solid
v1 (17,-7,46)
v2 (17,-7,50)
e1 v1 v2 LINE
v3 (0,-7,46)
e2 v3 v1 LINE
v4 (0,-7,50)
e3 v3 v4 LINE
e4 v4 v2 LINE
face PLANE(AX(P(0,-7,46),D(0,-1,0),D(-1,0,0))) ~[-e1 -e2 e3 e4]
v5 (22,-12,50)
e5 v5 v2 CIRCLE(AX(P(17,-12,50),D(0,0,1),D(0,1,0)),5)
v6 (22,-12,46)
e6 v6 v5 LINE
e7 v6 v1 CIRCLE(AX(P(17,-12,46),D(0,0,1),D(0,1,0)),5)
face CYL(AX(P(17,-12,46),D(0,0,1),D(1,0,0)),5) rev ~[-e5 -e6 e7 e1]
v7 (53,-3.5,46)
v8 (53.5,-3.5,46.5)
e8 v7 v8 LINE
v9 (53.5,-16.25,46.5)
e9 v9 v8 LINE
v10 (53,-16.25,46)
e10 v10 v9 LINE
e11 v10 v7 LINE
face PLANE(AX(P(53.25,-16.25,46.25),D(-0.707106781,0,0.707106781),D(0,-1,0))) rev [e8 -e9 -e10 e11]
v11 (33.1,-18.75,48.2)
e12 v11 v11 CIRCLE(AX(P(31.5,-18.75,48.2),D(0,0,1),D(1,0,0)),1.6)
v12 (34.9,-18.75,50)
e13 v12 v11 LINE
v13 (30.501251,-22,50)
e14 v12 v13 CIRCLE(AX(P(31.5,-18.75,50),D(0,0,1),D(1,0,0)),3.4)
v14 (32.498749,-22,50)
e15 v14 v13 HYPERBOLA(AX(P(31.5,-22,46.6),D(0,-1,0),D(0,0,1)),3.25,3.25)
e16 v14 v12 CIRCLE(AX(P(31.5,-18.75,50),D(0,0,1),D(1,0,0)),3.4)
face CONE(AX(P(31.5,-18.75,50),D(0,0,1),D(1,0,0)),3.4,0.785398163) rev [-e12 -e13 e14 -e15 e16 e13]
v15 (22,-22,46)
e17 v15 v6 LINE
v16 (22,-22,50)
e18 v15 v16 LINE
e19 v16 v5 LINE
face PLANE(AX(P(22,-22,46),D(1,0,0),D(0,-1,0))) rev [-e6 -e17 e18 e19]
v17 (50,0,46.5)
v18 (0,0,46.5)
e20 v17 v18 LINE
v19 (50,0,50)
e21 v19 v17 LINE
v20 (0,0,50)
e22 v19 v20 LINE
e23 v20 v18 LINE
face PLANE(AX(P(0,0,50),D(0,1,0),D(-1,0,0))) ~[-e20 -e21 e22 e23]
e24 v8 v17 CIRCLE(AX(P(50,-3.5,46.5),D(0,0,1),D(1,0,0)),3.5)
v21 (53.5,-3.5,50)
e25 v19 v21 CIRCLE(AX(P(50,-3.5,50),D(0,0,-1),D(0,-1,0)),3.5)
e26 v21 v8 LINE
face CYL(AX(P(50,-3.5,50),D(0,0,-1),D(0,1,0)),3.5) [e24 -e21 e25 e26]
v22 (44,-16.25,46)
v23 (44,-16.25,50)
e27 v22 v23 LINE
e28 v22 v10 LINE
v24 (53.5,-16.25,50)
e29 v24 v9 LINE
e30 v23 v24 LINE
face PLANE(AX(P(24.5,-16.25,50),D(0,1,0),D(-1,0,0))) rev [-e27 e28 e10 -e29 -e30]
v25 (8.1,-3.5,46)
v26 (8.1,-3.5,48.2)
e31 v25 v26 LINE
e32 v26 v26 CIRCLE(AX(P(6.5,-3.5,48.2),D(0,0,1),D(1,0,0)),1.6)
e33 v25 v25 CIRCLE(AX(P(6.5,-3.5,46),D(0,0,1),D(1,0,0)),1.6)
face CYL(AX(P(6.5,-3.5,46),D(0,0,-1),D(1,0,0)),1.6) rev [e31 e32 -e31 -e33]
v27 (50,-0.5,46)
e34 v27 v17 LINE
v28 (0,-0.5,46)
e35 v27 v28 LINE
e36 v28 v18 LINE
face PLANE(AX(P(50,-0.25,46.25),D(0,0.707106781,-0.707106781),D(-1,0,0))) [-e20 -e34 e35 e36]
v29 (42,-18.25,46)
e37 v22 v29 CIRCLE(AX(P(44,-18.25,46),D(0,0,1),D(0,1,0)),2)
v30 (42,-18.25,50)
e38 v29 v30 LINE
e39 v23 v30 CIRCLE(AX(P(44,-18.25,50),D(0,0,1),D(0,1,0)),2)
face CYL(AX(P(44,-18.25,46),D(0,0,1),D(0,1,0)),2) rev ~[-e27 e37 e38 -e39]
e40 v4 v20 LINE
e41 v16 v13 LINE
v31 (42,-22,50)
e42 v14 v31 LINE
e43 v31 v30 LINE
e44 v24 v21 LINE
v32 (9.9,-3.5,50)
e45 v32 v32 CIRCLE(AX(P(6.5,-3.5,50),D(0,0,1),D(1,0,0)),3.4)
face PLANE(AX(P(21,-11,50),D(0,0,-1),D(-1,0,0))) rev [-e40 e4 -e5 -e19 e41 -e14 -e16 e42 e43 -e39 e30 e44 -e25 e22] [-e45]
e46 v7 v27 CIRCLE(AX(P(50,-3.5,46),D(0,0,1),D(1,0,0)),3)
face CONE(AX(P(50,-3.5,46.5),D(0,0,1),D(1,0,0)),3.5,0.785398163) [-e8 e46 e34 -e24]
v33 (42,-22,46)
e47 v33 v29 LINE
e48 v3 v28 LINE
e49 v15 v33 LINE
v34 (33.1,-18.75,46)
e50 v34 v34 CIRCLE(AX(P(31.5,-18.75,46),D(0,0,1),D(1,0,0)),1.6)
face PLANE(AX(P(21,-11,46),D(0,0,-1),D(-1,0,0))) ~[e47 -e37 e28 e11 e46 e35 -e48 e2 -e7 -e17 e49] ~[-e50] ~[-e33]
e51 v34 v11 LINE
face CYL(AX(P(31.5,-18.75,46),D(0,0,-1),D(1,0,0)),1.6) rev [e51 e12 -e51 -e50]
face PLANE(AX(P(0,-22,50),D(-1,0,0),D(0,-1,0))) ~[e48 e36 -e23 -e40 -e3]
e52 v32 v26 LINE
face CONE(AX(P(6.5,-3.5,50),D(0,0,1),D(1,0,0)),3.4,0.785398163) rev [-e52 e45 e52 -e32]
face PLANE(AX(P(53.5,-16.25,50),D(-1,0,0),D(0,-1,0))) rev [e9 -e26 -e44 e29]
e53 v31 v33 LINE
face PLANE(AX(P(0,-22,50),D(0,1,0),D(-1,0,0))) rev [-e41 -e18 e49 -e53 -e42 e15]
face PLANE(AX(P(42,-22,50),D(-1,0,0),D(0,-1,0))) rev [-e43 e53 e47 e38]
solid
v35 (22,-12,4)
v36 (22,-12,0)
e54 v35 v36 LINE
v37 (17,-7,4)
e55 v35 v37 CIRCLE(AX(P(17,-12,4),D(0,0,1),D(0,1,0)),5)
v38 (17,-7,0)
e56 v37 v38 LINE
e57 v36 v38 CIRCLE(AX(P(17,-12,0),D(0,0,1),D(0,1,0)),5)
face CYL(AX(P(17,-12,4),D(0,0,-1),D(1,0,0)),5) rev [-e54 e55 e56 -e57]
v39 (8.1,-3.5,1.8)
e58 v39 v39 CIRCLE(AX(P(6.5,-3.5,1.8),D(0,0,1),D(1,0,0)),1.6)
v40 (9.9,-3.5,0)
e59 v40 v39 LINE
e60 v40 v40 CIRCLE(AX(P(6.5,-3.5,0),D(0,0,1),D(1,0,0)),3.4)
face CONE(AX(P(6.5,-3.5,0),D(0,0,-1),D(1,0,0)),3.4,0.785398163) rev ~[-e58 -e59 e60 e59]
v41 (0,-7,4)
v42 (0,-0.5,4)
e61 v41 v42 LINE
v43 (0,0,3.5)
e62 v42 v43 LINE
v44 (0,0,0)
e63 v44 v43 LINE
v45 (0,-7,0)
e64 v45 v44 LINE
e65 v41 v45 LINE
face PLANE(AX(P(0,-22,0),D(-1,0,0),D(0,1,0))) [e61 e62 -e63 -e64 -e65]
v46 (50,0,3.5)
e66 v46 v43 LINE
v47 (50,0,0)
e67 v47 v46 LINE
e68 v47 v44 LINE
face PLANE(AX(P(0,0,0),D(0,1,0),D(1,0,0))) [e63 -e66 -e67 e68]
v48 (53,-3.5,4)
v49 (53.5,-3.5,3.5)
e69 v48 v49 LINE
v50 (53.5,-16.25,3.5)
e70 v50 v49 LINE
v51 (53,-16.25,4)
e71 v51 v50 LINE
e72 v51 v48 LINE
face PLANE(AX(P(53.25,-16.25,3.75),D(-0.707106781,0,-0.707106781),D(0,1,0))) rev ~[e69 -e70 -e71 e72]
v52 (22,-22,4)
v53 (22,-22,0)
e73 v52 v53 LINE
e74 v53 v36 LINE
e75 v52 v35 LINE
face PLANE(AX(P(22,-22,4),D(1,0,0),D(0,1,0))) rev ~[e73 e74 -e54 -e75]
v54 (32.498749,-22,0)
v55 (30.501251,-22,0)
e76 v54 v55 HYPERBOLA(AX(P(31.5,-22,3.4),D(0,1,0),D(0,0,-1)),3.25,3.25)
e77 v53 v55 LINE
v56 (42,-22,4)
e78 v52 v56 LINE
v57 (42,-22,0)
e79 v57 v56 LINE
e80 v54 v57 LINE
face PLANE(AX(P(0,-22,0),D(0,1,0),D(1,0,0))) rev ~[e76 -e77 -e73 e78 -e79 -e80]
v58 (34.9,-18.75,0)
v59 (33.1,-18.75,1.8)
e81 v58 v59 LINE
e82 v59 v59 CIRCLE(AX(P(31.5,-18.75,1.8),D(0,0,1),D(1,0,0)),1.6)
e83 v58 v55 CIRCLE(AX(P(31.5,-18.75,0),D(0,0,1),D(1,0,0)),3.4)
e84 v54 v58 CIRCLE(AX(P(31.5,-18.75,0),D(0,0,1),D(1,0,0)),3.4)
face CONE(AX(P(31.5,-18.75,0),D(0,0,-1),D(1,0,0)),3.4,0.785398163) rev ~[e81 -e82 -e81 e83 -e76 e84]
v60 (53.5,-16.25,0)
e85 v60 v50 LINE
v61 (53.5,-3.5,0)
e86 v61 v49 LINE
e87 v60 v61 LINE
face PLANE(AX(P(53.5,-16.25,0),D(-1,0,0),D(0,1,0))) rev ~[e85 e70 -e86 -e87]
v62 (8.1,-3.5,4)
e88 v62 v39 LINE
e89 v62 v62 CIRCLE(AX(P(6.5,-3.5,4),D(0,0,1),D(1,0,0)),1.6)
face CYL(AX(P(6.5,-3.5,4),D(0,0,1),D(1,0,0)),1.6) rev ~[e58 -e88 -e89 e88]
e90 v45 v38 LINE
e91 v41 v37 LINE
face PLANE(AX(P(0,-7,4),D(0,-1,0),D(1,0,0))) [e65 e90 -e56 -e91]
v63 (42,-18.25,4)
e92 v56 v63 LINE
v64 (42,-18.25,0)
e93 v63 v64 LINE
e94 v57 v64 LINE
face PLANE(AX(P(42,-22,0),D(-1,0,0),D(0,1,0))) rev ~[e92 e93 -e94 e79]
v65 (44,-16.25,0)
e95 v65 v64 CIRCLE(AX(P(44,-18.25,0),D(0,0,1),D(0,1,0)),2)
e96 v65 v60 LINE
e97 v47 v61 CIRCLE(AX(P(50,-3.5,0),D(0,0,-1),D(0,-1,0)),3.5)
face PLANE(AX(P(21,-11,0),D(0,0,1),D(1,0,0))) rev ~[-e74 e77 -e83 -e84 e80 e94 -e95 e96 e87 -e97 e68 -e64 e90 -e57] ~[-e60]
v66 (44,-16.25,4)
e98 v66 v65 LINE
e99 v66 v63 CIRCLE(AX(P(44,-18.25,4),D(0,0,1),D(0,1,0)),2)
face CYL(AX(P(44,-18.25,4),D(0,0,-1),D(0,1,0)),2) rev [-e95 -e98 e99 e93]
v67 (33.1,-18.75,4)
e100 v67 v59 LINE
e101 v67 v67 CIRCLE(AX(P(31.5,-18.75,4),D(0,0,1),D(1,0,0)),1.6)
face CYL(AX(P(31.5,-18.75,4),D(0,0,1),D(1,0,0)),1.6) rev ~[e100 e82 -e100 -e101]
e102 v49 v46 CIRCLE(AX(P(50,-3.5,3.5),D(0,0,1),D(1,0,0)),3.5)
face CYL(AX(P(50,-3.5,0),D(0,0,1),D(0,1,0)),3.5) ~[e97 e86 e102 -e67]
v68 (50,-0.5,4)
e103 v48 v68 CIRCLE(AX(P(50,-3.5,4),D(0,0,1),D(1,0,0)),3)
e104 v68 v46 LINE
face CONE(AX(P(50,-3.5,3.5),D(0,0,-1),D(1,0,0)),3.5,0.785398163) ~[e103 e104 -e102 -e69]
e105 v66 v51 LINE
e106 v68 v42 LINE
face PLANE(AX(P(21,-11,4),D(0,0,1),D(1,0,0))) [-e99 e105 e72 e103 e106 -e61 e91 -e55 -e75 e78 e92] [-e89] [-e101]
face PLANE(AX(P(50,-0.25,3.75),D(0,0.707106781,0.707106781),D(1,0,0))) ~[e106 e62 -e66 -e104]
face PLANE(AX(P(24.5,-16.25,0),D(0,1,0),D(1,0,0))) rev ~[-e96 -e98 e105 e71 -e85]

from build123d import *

# Parameters (mm, degrees)
F0_W      = 42
F0_H      = 22
F1_DEPTH  = 4
F2_W      = 29
F2_H      = 16.25
F3_DEPTH  = 4
F4_R      = 3.5
F5_R      = 2
F6_R      = 1.6
F7_DEPTH  = 25
F8_W      = 22
F8_H      = 15
F9_DEPTH  = 25
F10_R     = 5
F11_R     = 1.6
F12_DEPTH = 25
F15_SIZE  = 0.5


# Not quite as in the source:
# - a fillet or chamfer that OpenCascade refuses, or shapes differently, is made with other operations: its cross-section is extruded or revolved along the edge and cut away or added


with BuildPart() as f1:
    # F0 (on Top) → F1 (new body)
    with BuildSketch(Plane.XY):
        with Locations((21, -11)):
            Rectangle(F0_W, F0_H)
    extrude(amount=F1_DEPTH)

    # F2 (on Top) → F3 (join)
    with BuildSketch(Plane.XY):
        with Locations((39, -8.125)):
            Rectangle(F2_W, F2_H)
    extrude(amount=F3_DEPTH)

    # F4
    f4_edges = [f1.edges().sort_by_distance(p)[0] for p in [
        (53.5, 0, 2),
    ]]
    fillet(f4_edges, radius=F4_R)

    # F5
    f5_edges = [f1.edges().sort_by_distance(p)[0] for p in [
        (42, -16.25, 2),
    ]]
    fillet(f5_edges, radius=F5_R)

    # F6 (on face) → F7 (cut)
    with BuildSketch(Plane.XY.offset(4)):
        with Locations((6.5, -3.5)):
            Circle(F6_R)
    extrude(amount=-F7_DEPTH, mode=Mode.SUBTRACT)

    # F8 (on face) → F9 (cut)
    with BuildSketch(Plane.XY.offset(4)):
        with Locations((11, -14.5)):
            Rectangle(F8_W, F8_H)
    extrude(amount=-F9_DEPTH, mode=Mode.SUBTRACT)

    # F10
    f10_edges = [f1.edges().sort_by_distance(p)[0] for p in [
        (22, -7, 2),
    ]]
    fillet(f10_edges, radius=F10_R)

    # F11 (on face) → F12 (cut)
    with BuildSketch(Plane.XY.offset(4)):
        with Locations((31.5, -18.75)):
            Circle(F11_R)
    extrude(amount=-F12_DEPTH, mode=Mode.SUBTRACT)

    # F14: chamfer of 1.8 on 2 edges, made by hand

    # F14_s1 → F14_t2 (revolve, cut)
    with BuildSketch(Plane.XZ.offset(18.75)):
        Polygon((34.9, 0), (33.1, 1.8), (33.1, 0), align=None)
    revolve(axis=Axis((31.5, -18.75, 0), (0, 0, 1)), mode=Mode.SUBTRACT)

    # F14_s3 → F14_t4 (revolve, cut)
    with BuildSketch(Plane.XZ.offset(3.5)):
        Polygon((9.9, 0), (8.1, 1.8), (8.1, 0), align=None)
    revolve(axis=Axis((6.5, -3.5, 0), (0, 0, 1)), mode=Mode.SUBTRACT)

    # F15
    f15_edges = [f1.edges().sort_by_distance(p)[0] for p in [
        (53.5, -9.875, 4),
        (52.474874, -1.025126, 4),
        (25, 0, 4),
    ]]
    chamfer(f15_edges, length=F15_SIZE)


with BuildPart() as f16_1:
    # F16: instance of F1
    add(f1.part.mirror(Plane.XY.offset(25)))


solid = Compound([f1.part, f16_1.part])
